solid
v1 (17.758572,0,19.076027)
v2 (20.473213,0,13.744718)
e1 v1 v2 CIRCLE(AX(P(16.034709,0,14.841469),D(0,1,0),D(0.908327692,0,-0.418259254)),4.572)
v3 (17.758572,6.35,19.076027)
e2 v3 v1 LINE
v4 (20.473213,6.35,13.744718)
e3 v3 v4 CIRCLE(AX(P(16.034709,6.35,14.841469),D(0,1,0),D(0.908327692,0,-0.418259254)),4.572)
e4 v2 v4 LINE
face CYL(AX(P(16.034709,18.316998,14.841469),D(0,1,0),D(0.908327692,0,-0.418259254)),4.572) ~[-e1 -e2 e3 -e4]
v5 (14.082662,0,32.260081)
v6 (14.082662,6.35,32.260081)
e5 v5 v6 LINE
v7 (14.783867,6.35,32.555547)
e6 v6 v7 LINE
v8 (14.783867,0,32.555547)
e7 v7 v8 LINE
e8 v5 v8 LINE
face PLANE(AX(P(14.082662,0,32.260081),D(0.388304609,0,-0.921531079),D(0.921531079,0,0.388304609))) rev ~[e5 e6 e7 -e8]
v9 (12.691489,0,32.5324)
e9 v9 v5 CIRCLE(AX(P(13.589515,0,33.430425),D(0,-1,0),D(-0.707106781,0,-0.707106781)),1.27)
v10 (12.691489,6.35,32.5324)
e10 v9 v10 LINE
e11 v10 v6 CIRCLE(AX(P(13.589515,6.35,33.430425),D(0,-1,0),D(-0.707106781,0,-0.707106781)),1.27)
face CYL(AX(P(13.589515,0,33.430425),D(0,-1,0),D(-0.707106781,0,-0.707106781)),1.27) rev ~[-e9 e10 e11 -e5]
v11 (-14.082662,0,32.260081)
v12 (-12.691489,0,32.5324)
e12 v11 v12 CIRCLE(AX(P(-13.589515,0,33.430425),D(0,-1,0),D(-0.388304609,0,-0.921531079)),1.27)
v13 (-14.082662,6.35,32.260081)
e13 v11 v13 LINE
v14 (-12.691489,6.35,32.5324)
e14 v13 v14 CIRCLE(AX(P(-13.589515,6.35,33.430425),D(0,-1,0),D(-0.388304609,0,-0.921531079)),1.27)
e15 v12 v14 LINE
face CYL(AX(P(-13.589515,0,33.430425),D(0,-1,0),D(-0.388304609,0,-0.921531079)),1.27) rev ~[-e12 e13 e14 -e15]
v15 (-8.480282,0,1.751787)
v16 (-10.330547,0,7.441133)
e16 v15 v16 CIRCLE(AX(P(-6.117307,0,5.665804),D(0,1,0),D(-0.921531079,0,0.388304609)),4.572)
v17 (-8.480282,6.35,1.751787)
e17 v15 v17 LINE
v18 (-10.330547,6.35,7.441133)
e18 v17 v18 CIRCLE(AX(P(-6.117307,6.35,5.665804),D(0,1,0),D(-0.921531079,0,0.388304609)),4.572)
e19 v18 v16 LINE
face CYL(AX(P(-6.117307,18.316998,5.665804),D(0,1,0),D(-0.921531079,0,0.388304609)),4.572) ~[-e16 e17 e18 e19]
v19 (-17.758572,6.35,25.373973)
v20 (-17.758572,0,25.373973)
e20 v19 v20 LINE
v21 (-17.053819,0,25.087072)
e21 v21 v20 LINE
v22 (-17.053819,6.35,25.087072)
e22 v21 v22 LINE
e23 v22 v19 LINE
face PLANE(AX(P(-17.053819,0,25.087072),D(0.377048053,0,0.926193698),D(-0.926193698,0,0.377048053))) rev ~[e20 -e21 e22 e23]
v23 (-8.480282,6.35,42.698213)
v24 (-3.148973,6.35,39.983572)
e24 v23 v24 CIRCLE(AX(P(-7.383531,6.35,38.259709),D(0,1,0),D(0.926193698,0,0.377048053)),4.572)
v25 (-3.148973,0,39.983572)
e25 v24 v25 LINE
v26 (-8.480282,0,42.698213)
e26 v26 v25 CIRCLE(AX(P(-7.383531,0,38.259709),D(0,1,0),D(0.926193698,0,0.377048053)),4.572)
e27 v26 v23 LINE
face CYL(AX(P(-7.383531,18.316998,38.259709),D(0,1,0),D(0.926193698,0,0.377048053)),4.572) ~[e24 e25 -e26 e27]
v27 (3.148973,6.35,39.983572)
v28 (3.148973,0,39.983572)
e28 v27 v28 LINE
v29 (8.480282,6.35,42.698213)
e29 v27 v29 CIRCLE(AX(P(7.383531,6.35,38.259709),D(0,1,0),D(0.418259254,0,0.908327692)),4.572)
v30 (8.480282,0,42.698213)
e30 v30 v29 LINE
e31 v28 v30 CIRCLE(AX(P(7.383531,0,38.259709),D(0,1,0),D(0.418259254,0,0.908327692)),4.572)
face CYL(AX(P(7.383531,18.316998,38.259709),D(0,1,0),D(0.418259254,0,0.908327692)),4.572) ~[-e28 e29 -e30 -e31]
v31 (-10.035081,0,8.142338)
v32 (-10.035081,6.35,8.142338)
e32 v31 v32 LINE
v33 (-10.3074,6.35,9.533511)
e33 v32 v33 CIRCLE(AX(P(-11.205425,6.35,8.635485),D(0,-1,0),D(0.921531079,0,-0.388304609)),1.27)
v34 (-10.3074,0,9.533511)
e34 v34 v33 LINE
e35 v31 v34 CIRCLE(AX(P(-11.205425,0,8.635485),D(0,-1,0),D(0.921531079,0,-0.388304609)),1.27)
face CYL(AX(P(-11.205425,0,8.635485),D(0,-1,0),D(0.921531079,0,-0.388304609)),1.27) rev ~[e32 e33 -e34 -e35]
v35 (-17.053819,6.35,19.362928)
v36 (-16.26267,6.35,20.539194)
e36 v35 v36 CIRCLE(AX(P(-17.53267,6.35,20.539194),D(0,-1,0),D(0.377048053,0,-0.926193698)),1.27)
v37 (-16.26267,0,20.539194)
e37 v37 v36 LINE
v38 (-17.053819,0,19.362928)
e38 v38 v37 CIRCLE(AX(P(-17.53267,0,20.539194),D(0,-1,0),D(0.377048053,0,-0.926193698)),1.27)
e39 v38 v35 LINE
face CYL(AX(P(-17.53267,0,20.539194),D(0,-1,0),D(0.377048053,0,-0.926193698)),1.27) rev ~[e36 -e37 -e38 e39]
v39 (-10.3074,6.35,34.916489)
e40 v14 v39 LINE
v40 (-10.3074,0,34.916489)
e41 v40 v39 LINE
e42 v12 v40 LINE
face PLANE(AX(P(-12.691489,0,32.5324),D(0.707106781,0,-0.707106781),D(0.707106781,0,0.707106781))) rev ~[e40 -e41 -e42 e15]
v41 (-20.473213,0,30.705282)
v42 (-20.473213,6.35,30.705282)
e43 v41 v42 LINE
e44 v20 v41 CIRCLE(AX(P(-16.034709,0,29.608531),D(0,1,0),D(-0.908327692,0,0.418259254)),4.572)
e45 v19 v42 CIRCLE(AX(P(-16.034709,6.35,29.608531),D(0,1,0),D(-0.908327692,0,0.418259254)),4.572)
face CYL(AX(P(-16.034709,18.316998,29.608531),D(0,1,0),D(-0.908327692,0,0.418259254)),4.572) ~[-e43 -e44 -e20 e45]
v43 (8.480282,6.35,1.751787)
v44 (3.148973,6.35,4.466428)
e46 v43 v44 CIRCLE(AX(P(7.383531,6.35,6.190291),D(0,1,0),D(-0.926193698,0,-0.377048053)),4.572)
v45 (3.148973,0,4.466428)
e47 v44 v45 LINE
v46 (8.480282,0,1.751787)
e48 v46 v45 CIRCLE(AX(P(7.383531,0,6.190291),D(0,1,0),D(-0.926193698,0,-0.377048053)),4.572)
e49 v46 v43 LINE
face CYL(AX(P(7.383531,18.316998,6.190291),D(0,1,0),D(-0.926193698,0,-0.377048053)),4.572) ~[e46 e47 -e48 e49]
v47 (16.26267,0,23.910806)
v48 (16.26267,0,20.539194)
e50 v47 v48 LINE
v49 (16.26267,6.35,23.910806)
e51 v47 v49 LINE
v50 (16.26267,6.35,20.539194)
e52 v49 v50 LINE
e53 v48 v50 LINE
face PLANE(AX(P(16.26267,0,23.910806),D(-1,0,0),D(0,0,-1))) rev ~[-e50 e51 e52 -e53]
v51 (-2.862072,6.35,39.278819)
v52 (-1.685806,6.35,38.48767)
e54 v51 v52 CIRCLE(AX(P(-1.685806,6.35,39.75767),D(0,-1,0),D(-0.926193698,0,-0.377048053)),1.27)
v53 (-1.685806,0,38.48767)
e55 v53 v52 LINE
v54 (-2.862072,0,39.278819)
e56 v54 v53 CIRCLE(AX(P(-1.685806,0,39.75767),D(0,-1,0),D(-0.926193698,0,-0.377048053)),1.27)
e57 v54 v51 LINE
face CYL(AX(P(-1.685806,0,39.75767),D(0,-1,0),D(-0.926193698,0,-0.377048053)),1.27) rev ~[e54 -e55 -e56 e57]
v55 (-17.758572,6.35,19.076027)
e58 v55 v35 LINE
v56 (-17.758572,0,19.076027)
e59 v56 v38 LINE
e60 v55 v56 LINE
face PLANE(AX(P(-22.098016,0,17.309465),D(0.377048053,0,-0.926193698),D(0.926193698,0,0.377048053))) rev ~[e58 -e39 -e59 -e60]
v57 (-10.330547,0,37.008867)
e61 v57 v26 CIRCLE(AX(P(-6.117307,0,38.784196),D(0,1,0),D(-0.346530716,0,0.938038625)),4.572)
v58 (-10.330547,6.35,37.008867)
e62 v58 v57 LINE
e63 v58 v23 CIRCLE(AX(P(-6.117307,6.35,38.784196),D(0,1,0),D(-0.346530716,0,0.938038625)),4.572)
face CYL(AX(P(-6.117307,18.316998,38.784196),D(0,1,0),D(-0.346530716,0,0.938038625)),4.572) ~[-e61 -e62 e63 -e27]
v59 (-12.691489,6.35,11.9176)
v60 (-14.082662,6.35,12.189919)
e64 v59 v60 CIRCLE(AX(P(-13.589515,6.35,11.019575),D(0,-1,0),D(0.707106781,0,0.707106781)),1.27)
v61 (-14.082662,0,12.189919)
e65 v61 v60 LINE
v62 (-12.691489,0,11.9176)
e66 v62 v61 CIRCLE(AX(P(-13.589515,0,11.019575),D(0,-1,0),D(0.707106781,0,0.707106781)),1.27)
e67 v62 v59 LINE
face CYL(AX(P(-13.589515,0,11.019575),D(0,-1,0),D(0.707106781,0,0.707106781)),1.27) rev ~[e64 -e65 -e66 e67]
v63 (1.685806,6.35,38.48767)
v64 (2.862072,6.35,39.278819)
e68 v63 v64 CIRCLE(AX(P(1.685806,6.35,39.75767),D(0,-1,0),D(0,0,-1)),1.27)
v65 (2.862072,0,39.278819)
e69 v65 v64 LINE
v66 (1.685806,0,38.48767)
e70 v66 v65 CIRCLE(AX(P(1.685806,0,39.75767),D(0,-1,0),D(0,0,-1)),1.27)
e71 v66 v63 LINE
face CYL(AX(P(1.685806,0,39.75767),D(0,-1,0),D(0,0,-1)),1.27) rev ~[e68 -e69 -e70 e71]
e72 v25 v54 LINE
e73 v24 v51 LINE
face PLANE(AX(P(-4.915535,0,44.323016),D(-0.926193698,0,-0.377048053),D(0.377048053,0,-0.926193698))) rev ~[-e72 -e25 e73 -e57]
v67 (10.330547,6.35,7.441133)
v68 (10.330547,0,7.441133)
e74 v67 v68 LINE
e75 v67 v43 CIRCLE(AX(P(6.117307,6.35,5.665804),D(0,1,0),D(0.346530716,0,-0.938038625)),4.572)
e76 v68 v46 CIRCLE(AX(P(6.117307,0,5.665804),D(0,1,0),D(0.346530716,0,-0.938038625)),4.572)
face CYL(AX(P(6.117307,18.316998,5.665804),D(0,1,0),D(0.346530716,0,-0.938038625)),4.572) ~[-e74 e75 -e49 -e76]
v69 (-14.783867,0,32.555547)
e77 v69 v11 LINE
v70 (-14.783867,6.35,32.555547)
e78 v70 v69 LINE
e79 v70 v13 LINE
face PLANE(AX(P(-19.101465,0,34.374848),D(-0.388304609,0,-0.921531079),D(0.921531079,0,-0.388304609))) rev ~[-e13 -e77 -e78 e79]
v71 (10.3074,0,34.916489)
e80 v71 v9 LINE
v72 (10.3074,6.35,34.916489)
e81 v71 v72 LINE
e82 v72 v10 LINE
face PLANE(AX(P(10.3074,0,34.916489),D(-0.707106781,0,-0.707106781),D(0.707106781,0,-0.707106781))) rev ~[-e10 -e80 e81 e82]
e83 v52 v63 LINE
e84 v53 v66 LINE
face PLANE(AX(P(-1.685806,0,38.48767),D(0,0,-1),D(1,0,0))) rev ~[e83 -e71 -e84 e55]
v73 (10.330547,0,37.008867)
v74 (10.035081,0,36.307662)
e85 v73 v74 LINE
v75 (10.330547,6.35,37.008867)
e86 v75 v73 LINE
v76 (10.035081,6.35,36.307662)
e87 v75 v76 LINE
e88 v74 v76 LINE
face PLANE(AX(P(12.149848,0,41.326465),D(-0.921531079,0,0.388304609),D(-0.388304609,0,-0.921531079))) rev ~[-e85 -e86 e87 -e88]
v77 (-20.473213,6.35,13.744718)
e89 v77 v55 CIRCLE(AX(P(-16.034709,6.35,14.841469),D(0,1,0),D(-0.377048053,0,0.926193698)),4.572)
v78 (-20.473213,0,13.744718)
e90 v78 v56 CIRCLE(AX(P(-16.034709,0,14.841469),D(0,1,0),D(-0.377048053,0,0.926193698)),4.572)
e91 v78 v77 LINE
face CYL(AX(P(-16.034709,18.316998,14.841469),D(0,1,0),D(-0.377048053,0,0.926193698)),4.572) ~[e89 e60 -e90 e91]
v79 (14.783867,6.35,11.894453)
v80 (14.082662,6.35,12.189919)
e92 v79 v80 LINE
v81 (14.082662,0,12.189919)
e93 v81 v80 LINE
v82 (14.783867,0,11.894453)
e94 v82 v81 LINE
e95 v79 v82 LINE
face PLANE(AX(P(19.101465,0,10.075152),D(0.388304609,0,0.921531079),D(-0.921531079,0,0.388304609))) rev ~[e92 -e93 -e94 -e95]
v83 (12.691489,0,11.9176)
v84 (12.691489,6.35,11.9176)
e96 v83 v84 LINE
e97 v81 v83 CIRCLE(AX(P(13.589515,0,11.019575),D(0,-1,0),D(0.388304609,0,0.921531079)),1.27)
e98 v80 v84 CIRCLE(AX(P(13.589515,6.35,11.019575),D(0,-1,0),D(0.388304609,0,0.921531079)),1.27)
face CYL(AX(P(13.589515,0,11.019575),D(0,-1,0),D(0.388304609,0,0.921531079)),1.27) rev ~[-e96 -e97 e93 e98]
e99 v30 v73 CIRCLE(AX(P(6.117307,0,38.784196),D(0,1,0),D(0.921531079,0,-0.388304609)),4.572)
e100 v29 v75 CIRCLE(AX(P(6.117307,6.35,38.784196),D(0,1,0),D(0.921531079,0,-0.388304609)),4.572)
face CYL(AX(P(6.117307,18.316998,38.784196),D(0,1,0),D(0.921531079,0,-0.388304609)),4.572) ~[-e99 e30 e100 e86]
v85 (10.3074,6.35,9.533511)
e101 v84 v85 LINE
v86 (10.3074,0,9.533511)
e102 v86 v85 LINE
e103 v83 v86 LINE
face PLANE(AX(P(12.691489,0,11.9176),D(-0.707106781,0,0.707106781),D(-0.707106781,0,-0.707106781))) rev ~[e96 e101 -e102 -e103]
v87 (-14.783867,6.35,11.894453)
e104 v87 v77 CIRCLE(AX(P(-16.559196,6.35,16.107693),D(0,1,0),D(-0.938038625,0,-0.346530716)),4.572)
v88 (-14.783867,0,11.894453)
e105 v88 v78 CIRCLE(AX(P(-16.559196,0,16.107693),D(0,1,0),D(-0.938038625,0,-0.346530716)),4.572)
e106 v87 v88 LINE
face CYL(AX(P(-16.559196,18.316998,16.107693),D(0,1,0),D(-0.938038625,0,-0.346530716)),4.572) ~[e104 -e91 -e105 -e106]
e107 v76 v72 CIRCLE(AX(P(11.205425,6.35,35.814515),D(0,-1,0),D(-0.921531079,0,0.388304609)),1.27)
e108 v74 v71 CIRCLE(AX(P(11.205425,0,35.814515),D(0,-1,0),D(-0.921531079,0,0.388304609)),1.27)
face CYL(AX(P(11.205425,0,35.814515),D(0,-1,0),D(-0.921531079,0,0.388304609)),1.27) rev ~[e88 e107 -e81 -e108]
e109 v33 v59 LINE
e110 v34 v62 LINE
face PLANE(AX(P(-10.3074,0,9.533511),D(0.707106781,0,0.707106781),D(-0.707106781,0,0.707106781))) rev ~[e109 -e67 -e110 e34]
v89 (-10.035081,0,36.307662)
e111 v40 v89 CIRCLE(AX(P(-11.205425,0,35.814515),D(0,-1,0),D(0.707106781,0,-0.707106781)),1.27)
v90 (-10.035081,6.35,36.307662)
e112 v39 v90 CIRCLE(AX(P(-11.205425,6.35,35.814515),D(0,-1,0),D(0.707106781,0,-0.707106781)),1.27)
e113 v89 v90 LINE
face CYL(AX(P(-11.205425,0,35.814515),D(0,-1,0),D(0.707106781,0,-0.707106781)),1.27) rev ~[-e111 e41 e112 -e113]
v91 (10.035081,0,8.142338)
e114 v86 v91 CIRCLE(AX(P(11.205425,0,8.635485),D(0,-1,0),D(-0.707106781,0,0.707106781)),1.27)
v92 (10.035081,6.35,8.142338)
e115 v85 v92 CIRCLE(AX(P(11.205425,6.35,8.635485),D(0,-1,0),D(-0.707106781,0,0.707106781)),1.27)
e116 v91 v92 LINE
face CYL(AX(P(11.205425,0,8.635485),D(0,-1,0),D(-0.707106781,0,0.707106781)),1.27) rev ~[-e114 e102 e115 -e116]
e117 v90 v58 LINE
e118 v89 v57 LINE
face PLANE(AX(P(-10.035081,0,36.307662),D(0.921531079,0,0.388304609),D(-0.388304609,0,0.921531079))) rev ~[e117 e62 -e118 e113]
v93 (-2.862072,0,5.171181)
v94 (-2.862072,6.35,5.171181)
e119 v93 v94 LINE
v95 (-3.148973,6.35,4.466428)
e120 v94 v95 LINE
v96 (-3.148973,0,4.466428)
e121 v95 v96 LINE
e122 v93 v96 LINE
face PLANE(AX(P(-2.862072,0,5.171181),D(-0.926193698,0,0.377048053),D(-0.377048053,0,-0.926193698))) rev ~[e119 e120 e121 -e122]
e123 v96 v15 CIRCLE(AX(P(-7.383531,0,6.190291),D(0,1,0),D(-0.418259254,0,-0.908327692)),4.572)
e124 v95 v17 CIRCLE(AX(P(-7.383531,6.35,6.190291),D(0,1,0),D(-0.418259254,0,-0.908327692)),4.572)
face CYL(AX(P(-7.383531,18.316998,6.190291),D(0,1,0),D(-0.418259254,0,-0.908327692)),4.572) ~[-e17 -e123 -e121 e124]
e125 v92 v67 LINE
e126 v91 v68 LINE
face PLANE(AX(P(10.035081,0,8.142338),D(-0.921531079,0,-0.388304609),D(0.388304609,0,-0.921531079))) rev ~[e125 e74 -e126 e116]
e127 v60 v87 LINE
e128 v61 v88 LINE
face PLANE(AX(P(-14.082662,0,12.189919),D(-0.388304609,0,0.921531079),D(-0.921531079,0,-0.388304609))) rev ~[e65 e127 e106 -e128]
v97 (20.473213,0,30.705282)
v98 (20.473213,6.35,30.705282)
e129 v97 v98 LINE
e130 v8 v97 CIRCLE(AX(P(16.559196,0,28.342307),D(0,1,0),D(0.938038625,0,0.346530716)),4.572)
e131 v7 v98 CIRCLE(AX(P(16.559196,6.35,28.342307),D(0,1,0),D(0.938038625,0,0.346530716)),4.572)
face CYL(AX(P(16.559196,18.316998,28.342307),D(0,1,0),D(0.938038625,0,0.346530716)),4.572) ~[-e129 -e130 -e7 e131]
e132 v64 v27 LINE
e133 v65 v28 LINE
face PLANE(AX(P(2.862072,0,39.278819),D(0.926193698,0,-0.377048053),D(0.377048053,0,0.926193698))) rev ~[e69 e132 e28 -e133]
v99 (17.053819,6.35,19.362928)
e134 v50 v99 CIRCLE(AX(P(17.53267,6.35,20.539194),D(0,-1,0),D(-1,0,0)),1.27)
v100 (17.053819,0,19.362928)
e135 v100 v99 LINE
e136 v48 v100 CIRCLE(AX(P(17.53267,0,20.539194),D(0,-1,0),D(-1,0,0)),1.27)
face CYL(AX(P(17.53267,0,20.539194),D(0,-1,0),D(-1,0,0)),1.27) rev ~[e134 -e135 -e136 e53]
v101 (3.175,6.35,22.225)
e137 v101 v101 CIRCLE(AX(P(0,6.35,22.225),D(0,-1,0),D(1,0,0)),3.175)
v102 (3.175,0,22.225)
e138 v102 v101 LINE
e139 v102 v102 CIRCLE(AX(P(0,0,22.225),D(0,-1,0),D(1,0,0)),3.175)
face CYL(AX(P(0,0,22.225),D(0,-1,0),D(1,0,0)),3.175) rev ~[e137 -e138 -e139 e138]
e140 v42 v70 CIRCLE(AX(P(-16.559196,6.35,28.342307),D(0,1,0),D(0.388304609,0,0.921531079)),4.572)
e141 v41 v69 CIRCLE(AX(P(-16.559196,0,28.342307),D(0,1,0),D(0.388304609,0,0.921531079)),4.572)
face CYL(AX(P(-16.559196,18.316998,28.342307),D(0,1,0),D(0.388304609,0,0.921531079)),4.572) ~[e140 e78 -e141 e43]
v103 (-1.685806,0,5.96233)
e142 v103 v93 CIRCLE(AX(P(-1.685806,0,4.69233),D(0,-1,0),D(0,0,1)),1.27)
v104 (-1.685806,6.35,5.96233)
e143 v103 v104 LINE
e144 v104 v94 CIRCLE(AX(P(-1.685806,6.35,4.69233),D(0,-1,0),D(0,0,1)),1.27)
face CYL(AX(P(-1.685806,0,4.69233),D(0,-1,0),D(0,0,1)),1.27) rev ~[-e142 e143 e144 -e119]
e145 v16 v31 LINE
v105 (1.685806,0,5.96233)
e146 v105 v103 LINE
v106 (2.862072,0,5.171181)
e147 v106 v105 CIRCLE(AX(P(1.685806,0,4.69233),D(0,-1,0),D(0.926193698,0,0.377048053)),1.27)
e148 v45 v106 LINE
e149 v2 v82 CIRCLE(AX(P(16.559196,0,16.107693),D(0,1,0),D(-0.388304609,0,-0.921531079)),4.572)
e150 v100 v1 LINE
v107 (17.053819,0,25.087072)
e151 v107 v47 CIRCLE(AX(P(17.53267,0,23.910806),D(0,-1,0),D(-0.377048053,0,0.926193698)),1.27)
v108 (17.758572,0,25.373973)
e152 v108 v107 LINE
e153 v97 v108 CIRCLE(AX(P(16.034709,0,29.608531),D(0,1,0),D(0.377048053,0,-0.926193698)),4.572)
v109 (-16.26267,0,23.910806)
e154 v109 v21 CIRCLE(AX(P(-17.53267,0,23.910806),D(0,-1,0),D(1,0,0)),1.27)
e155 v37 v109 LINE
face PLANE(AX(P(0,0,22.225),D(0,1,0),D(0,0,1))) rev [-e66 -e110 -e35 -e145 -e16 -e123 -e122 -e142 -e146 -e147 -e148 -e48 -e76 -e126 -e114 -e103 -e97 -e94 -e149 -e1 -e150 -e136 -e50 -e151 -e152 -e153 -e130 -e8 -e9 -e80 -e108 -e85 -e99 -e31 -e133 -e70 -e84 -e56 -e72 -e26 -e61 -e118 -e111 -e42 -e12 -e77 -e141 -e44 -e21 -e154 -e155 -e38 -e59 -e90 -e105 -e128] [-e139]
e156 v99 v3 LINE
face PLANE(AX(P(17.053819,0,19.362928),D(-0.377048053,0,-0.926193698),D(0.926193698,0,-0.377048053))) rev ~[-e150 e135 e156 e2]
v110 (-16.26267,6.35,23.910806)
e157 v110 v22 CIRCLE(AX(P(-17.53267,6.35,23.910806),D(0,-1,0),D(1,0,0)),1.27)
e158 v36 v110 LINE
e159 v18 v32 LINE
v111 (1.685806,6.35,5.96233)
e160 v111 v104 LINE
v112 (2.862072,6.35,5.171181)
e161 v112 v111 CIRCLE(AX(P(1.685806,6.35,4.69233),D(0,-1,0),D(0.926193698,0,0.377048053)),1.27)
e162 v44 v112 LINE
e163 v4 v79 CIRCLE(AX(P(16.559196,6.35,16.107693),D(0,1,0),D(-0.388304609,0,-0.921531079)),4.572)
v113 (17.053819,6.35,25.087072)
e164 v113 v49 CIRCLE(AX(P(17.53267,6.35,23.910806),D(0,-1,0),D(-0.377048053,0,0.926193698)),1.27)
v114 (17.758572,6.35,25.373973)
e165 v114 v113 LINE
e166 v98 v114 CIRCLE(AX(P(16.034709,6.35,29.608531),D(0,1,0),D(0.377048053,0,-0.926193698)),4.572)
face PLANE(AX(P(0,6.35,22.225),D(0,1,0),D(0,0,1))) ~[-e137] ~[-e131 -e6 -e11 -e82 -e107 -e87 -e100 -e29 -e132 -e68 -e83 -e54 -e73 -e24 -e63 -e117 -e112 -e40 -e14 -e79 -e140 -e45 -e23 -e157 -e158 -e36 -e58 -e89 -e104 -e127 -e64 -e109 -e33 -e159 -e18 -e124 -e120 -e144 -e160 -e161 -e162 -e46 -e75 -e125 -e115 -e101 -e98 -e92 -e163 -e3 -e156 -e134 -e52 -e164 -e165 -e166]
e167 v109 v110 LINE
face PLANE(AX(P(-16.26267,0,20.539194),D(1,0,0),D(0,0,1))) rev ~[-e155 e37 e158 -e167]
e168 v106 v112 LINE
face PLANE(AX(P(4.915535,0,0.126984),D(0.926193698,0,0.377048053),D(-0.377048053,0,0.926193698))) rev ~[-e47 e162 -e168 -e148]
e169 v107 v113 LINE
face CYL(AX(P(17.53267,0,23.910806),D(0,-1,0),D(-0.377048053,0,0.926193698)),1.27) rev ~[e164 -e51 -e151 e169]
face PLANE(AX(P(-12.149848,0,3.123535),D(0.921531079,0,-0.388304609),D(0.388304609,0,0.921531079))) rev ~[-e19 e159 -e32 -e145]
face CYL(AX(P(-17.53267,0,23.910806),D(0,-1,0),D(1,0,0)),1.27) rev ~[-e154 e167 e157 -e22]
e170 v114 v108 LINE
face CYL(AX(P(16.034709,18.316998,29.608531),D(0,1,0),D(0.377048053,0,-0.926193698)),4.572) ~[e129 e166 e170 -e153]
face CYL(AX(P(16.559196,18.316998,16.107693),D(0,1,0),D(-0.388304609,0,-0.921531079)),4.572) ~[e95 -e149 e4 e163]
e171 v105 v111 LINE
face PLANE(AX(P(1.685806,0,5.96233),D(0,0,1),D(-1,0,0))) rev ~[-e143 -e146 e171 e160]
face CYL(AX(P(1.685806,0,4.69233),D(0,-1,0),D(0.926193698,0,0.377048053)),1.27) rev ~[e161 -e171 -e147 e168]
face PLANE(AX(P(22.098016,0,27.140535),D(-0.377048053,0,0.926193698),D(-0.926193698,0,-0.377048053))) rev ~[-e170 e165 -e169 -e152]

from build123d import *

# Parameters (mm, degrees)
F0_W            = 6.35
F0_H            = 22.225
F3_DEPTH        = 6.35
F3_COPIES_COUNT = 8
F4_T1_DEPTH     = 30.2839966419
F4_T3_DEPTH     = 30.283996606
F5_R            = 3.175
F6_DEPTH        = 6.35


# Not quite as in the source:
# - a fillet or chamfer that OpenCascade refuses, or shapes differently, is made with other operations: its cross-section is extruded or revolved along the edge and cut away or added
# - a pattern or mirror of a feature is missing from the dataset's text; its kind, count and spacing are read off the source's solid


with BuildPart() as f1:
    # F0 (on Right) → F1 (revolve)
    with BuildSketch(Plane.YZ):
        with Locations((3.175, 33.3375)):
            Rectangle(F0_W, F0_H)
    revolve(axis=Axis((0, 3.175, 22.225), (0, 1, 0)))

    # F2 (on Front) → F3 (cut)
    with BuildSketch(Plane.XZ):
        with BuildLine():
            Line((-1.59e-08, 38.4876703219), (-1.59e-08, 44.3230155219))
            Line((-1.59e-08, 44.3230155219), (-1.59e-08, 44.457260554))
            Line((-1.59e-08, 44.457260554), (-4.9701853855, 44.457260554))
            Line((-4.9701853855, 44.457260554), (-4.9155350159, 44.3230155219))
            Line((-4.9155350159, 44.3230155219), (-2.8620721488, 39.2788192947))
            ThreePointArc((-2.8620721488, 39.2788192947), (-2.3945935663, 38.7038580036), (-1.6858061527, 38.4876703219))
            Line((-1.6858061527, 38.4876703219), (-1.59e-08, 38.4876703219))
        make_face()
        with BuildLine():
            Line((-1.59e-08, 44.457260554), (-1.59e-08, 44.3230155219))
            Line((-1.59e-08, 44.3230155219), (-1.59e-08, 38.4876703219))
            Line((-1.59e-08, 38.4876703219), (1.6858061209, 38.4876703219))
            ThreePointArc((1.6858061209, 38.4876703219), (2.3945935345, 38.7038580036), (2.8620721171, 39.2788192947))
            Line((2.8620721171, 39.2788192947), (4.9155349841, 44.3230155219))
            Line((4.9155349841, 44.3230155219), (4.9701853538, 44.457260554))
            Line((4.9701853538, 44.457260554), (-1.59e-08, 44.457260554))
        make_face()
    f3 = extrude(amount=-F3_DEPTH, mode=Mode.SUBTRACT)

    # F3_copies: F3 ×8 about axis
    f3_copies_axis = Axis((0, 0, 22.225), (0, 1, 0))
    for i in range(1, F3_COPIES_COUNT):
        add(f3.rotate(f3_copies_axis, i * 360 / F3_COPIES_COUNT), mode=Mode.SUBTRACT)

    # F4: fillet of radius 4.572 on 16 edges, made by hand

    # F4_s2 → F4_t1 (cut)
    with BuildSketch(Plane.XZ.offset(-18.3169983209)):
        with BuildLine():
            ThreePointArc((-3.1489730441, 39.9835724397), (-5.703273274, 42.5117575675), (-9.2958119446, 42.4125829482))
            ThreePointArc((-9.2958119446, 42.4125829482), (-7.0677616426, 43.2962451071), (-4.757507246, 43.934830718))
            Line((-4.757507246, 43.934830718), (-3.1489730441, 39.9835724397))
        make_face()
        with BuildLine():
            ThreePointArc((-10.330546803, 7.4411328104), (-10.3120806372, 3.8472729487), (-7.7016451357, 1.3770915389))
            ThreePointArc((-7.7016451357, 1.3770915389), (-9.901958118, 2.3277175114), (-11.9871028839, 3.5097658457))
            Line((-11.9871028839, 3.5097658457), (-10.330546803, 7.4411328104))
        make_face()
        with BuildLine():
            ThreePointArc((3.1489730441, 4.4664275603), (5.703273274, 1.9382424325), (9.2958119446, 2.0374170518))
            ThreePointArc((9.2958119446, 2.0374170518), (7.0677616426, 1.1537548929), (4.757507246, 0.515169282))
            Line((4.757507246, 0.515169282), (3.1489730441, 4.4664275603))
        make_face()
        with BuildLine():
            ThreePointArc((14.7838671896, 11.894453197), (18.3777270513, 11.9129193628), (20.8479084611, 14.5233548643))
            ThreePointArc((20.8479084611, 14.5233548643), (19.8972824886, 12.323041882), (18.7152341543, 10.2378971161))
            Line((18.7152341543, 10.2378971161), (14.7838671896, 11.894453197))
        make_face()
        with BuildLine():
            ThreePointArc((17.7585724397, 25.3739730441), (20.2867575675, 27.928273274), (20.1875829482, 31.5208119446))
            ThreePointArc((20.1875829482, 31.5208119446), (21.0712451071, 29.2927616426), (21.709830718, 26.982507246))
            Line((21.709830718, 26.982507246), (17.7585724397, 25.3739730441))
        make_face()
        with BuildLine():
            ThreePointArc((10.330546803, 37.0088671896), (10.3120806372, 40.6027270513), (7.7016451357, 43.0729084611))
            ThreePointArc((7.7016451357, 43.0729084611), (9.901958118, 42.1222824886), (11.9871028839, 40.9402341543))
            Line((11.9871028839, 40.9402341543), (10.330546803, 37.0088671896))
        make_face()
        with BuildLine():
            ThreePointArc((-14.7838671896, 32.555546803), (-18.3777270513, 32.5370806372), (-20.8479084611, 29.9266451357))
            ThreePointArc((-20.8479084611, 29.9266451357), (-19.8972824886, 32.126958118), (-18.7152341543, 34.2121028839))
            Line((-18.7152341543, 34.2121028839), (-14.7838671896, 32.555546803))
        make_face()
        with BuildLine():
            ThreePointArc((-17.7585724397, 19.0760269559), (-20.2867575675, 16.521726726), (-20.1875829482, 12.9291880554))
            ThreePointArc((-20.1875829482, 12.9291880554), (-21.0712451071, 15.1572383574), (-21.709830718, 17.467492754))
            Line((-21.709830718, 17.467492754), (-17.7585724397, 19.0760269559))
        make_face()
    extrude(amount=F4_T1_DEPTH, mode=Mode.SUBTRACT)

    # F4_s4 → F4_t3 (cut)
    with BuildSketch(Plane.XZ.offset(-18.316998303)):
        with BuildLine():
            ThreePointArc((9.295811911, 42.4125829637), (5.7032732438, 42.5117575784), (3.1489730174, 39.983572452))
            Line((3.1489730174, 39.983572452), (4.7575072169, 43.9348307244))
            ThreePointArc((4.7575072169, 43.9348307244), (7.0677616109, 43.2962451177), (9.295811911, 42.4125829637))
        make_face()
        with BuildLine():
            ThreePointArc((-9.295811911, 2.0374170363), (-5.7032732438, 1.9382424216), (-3.1489730174, 4.466427548))
            Line((-3.1489730174, 4.466427548), (-4.7575072169, 0.5151692756))
            ThreePointArc((-4.7575072169, 0.5151692756), (-7.0677616109, 1.1537548823), (-9.295811911, 2.0374170363))
        make_face()
        with BuildLine():
            ThreePointArc((7.7016451705, 1.3770915517), (10.3120806663, 3.8472729624), (10.3305468306, 7.4411328206))
            Line((10.3305468306, 7.4411328206), (11.987102909, 3.5097658618))
            ThreePointArc((11.987102909, 3.5097658618), (9.9019581479, 2.3277175263), (7.7016451705, 1.3770915517))
        make_face()
        with BuildLine():
            ThreePointArc((20.1875829637, 12.929188089), (20.2867575784, 16.5217267562), (17.758572452, 19.0760269826))
            Line((17.758572452, 19.0760269826), (21.7098307244, 17.4674927831))
            ThreePointArc((21.7098307244, 17.4674927831), (21.0712451177, 15.1572383891), (20.1875829637, 12.929188089))
        make_face()
        with BuildLine():
            ThreePointArc((20.8479084483, 29.9266451705), (18.3777270376, 32.5370806663), (14.7838671794, 32.5555468306))
            Line((14.7838671794, 32.5555468306), (18.7152341382, 34.212102909))
            ThreePointArc((18.7152341382, 34.212102909), (19.8972824737, 32.1269581479), (20.8479084483, 29.9266451705))
        make_face()
        with BuildLine():
            ThreePointArc((-7.7016451705, 43.0729084483), (-10.3120806663, 40.6027270376), (-10.3305468306, 37.0088671794))
            Line((-10.3305468306, 37.0088671794), (-11.987102909, 40.9402341382))
            ThreePointArc((-11.987102909, 40.9402341382), (-9.9019581479, 42.1222824737), (-7.7016451705, 43.0729084483))
        make_face()
        with BuildLine():
            ThreePointArc((-20.1875829637, 31.520811911), (-20.2867575784, 27.9282732438), (-17.758572452, 25.3739730174))
            Line((-17.758572452, 25.3739730174), (-21.7098307244, 26.9825072169))
            ThreePointArc((-21.7098307244, 26.9825072169), (-21.0712451177, 29.2927616109), (-20.1875829637, 31.520811911))
        make_face()
        with BuildLine():
            ThreePointArc((-20.8479084483, 14.5233548295), (-18.3777270376, 11.9129193337), (-14.7838671794, 11.8944531694))
            Line((-14.7838671794, 11.8944531694), (-18.7152341382, 10.237897091))
            ThreePointArc((-18.7152341382, 10.237897091), (-19.8972824737, 12.3230418521), (-20.8479084483, 14.5233548295))
        make_face()
    extrude(amount=F4_T3_DEPTH, mode=Mode.SUBTRACT)

    # F5 (on Front) → F6 (cut)
    with BuildSketch(Plane.XZ):
        with Locations((0, 22.225)):
            Circle(F5_R)
    extrude(amount=-F6_DEPTH, mode=Mode.SUBTRACT)


solid = f1.part
